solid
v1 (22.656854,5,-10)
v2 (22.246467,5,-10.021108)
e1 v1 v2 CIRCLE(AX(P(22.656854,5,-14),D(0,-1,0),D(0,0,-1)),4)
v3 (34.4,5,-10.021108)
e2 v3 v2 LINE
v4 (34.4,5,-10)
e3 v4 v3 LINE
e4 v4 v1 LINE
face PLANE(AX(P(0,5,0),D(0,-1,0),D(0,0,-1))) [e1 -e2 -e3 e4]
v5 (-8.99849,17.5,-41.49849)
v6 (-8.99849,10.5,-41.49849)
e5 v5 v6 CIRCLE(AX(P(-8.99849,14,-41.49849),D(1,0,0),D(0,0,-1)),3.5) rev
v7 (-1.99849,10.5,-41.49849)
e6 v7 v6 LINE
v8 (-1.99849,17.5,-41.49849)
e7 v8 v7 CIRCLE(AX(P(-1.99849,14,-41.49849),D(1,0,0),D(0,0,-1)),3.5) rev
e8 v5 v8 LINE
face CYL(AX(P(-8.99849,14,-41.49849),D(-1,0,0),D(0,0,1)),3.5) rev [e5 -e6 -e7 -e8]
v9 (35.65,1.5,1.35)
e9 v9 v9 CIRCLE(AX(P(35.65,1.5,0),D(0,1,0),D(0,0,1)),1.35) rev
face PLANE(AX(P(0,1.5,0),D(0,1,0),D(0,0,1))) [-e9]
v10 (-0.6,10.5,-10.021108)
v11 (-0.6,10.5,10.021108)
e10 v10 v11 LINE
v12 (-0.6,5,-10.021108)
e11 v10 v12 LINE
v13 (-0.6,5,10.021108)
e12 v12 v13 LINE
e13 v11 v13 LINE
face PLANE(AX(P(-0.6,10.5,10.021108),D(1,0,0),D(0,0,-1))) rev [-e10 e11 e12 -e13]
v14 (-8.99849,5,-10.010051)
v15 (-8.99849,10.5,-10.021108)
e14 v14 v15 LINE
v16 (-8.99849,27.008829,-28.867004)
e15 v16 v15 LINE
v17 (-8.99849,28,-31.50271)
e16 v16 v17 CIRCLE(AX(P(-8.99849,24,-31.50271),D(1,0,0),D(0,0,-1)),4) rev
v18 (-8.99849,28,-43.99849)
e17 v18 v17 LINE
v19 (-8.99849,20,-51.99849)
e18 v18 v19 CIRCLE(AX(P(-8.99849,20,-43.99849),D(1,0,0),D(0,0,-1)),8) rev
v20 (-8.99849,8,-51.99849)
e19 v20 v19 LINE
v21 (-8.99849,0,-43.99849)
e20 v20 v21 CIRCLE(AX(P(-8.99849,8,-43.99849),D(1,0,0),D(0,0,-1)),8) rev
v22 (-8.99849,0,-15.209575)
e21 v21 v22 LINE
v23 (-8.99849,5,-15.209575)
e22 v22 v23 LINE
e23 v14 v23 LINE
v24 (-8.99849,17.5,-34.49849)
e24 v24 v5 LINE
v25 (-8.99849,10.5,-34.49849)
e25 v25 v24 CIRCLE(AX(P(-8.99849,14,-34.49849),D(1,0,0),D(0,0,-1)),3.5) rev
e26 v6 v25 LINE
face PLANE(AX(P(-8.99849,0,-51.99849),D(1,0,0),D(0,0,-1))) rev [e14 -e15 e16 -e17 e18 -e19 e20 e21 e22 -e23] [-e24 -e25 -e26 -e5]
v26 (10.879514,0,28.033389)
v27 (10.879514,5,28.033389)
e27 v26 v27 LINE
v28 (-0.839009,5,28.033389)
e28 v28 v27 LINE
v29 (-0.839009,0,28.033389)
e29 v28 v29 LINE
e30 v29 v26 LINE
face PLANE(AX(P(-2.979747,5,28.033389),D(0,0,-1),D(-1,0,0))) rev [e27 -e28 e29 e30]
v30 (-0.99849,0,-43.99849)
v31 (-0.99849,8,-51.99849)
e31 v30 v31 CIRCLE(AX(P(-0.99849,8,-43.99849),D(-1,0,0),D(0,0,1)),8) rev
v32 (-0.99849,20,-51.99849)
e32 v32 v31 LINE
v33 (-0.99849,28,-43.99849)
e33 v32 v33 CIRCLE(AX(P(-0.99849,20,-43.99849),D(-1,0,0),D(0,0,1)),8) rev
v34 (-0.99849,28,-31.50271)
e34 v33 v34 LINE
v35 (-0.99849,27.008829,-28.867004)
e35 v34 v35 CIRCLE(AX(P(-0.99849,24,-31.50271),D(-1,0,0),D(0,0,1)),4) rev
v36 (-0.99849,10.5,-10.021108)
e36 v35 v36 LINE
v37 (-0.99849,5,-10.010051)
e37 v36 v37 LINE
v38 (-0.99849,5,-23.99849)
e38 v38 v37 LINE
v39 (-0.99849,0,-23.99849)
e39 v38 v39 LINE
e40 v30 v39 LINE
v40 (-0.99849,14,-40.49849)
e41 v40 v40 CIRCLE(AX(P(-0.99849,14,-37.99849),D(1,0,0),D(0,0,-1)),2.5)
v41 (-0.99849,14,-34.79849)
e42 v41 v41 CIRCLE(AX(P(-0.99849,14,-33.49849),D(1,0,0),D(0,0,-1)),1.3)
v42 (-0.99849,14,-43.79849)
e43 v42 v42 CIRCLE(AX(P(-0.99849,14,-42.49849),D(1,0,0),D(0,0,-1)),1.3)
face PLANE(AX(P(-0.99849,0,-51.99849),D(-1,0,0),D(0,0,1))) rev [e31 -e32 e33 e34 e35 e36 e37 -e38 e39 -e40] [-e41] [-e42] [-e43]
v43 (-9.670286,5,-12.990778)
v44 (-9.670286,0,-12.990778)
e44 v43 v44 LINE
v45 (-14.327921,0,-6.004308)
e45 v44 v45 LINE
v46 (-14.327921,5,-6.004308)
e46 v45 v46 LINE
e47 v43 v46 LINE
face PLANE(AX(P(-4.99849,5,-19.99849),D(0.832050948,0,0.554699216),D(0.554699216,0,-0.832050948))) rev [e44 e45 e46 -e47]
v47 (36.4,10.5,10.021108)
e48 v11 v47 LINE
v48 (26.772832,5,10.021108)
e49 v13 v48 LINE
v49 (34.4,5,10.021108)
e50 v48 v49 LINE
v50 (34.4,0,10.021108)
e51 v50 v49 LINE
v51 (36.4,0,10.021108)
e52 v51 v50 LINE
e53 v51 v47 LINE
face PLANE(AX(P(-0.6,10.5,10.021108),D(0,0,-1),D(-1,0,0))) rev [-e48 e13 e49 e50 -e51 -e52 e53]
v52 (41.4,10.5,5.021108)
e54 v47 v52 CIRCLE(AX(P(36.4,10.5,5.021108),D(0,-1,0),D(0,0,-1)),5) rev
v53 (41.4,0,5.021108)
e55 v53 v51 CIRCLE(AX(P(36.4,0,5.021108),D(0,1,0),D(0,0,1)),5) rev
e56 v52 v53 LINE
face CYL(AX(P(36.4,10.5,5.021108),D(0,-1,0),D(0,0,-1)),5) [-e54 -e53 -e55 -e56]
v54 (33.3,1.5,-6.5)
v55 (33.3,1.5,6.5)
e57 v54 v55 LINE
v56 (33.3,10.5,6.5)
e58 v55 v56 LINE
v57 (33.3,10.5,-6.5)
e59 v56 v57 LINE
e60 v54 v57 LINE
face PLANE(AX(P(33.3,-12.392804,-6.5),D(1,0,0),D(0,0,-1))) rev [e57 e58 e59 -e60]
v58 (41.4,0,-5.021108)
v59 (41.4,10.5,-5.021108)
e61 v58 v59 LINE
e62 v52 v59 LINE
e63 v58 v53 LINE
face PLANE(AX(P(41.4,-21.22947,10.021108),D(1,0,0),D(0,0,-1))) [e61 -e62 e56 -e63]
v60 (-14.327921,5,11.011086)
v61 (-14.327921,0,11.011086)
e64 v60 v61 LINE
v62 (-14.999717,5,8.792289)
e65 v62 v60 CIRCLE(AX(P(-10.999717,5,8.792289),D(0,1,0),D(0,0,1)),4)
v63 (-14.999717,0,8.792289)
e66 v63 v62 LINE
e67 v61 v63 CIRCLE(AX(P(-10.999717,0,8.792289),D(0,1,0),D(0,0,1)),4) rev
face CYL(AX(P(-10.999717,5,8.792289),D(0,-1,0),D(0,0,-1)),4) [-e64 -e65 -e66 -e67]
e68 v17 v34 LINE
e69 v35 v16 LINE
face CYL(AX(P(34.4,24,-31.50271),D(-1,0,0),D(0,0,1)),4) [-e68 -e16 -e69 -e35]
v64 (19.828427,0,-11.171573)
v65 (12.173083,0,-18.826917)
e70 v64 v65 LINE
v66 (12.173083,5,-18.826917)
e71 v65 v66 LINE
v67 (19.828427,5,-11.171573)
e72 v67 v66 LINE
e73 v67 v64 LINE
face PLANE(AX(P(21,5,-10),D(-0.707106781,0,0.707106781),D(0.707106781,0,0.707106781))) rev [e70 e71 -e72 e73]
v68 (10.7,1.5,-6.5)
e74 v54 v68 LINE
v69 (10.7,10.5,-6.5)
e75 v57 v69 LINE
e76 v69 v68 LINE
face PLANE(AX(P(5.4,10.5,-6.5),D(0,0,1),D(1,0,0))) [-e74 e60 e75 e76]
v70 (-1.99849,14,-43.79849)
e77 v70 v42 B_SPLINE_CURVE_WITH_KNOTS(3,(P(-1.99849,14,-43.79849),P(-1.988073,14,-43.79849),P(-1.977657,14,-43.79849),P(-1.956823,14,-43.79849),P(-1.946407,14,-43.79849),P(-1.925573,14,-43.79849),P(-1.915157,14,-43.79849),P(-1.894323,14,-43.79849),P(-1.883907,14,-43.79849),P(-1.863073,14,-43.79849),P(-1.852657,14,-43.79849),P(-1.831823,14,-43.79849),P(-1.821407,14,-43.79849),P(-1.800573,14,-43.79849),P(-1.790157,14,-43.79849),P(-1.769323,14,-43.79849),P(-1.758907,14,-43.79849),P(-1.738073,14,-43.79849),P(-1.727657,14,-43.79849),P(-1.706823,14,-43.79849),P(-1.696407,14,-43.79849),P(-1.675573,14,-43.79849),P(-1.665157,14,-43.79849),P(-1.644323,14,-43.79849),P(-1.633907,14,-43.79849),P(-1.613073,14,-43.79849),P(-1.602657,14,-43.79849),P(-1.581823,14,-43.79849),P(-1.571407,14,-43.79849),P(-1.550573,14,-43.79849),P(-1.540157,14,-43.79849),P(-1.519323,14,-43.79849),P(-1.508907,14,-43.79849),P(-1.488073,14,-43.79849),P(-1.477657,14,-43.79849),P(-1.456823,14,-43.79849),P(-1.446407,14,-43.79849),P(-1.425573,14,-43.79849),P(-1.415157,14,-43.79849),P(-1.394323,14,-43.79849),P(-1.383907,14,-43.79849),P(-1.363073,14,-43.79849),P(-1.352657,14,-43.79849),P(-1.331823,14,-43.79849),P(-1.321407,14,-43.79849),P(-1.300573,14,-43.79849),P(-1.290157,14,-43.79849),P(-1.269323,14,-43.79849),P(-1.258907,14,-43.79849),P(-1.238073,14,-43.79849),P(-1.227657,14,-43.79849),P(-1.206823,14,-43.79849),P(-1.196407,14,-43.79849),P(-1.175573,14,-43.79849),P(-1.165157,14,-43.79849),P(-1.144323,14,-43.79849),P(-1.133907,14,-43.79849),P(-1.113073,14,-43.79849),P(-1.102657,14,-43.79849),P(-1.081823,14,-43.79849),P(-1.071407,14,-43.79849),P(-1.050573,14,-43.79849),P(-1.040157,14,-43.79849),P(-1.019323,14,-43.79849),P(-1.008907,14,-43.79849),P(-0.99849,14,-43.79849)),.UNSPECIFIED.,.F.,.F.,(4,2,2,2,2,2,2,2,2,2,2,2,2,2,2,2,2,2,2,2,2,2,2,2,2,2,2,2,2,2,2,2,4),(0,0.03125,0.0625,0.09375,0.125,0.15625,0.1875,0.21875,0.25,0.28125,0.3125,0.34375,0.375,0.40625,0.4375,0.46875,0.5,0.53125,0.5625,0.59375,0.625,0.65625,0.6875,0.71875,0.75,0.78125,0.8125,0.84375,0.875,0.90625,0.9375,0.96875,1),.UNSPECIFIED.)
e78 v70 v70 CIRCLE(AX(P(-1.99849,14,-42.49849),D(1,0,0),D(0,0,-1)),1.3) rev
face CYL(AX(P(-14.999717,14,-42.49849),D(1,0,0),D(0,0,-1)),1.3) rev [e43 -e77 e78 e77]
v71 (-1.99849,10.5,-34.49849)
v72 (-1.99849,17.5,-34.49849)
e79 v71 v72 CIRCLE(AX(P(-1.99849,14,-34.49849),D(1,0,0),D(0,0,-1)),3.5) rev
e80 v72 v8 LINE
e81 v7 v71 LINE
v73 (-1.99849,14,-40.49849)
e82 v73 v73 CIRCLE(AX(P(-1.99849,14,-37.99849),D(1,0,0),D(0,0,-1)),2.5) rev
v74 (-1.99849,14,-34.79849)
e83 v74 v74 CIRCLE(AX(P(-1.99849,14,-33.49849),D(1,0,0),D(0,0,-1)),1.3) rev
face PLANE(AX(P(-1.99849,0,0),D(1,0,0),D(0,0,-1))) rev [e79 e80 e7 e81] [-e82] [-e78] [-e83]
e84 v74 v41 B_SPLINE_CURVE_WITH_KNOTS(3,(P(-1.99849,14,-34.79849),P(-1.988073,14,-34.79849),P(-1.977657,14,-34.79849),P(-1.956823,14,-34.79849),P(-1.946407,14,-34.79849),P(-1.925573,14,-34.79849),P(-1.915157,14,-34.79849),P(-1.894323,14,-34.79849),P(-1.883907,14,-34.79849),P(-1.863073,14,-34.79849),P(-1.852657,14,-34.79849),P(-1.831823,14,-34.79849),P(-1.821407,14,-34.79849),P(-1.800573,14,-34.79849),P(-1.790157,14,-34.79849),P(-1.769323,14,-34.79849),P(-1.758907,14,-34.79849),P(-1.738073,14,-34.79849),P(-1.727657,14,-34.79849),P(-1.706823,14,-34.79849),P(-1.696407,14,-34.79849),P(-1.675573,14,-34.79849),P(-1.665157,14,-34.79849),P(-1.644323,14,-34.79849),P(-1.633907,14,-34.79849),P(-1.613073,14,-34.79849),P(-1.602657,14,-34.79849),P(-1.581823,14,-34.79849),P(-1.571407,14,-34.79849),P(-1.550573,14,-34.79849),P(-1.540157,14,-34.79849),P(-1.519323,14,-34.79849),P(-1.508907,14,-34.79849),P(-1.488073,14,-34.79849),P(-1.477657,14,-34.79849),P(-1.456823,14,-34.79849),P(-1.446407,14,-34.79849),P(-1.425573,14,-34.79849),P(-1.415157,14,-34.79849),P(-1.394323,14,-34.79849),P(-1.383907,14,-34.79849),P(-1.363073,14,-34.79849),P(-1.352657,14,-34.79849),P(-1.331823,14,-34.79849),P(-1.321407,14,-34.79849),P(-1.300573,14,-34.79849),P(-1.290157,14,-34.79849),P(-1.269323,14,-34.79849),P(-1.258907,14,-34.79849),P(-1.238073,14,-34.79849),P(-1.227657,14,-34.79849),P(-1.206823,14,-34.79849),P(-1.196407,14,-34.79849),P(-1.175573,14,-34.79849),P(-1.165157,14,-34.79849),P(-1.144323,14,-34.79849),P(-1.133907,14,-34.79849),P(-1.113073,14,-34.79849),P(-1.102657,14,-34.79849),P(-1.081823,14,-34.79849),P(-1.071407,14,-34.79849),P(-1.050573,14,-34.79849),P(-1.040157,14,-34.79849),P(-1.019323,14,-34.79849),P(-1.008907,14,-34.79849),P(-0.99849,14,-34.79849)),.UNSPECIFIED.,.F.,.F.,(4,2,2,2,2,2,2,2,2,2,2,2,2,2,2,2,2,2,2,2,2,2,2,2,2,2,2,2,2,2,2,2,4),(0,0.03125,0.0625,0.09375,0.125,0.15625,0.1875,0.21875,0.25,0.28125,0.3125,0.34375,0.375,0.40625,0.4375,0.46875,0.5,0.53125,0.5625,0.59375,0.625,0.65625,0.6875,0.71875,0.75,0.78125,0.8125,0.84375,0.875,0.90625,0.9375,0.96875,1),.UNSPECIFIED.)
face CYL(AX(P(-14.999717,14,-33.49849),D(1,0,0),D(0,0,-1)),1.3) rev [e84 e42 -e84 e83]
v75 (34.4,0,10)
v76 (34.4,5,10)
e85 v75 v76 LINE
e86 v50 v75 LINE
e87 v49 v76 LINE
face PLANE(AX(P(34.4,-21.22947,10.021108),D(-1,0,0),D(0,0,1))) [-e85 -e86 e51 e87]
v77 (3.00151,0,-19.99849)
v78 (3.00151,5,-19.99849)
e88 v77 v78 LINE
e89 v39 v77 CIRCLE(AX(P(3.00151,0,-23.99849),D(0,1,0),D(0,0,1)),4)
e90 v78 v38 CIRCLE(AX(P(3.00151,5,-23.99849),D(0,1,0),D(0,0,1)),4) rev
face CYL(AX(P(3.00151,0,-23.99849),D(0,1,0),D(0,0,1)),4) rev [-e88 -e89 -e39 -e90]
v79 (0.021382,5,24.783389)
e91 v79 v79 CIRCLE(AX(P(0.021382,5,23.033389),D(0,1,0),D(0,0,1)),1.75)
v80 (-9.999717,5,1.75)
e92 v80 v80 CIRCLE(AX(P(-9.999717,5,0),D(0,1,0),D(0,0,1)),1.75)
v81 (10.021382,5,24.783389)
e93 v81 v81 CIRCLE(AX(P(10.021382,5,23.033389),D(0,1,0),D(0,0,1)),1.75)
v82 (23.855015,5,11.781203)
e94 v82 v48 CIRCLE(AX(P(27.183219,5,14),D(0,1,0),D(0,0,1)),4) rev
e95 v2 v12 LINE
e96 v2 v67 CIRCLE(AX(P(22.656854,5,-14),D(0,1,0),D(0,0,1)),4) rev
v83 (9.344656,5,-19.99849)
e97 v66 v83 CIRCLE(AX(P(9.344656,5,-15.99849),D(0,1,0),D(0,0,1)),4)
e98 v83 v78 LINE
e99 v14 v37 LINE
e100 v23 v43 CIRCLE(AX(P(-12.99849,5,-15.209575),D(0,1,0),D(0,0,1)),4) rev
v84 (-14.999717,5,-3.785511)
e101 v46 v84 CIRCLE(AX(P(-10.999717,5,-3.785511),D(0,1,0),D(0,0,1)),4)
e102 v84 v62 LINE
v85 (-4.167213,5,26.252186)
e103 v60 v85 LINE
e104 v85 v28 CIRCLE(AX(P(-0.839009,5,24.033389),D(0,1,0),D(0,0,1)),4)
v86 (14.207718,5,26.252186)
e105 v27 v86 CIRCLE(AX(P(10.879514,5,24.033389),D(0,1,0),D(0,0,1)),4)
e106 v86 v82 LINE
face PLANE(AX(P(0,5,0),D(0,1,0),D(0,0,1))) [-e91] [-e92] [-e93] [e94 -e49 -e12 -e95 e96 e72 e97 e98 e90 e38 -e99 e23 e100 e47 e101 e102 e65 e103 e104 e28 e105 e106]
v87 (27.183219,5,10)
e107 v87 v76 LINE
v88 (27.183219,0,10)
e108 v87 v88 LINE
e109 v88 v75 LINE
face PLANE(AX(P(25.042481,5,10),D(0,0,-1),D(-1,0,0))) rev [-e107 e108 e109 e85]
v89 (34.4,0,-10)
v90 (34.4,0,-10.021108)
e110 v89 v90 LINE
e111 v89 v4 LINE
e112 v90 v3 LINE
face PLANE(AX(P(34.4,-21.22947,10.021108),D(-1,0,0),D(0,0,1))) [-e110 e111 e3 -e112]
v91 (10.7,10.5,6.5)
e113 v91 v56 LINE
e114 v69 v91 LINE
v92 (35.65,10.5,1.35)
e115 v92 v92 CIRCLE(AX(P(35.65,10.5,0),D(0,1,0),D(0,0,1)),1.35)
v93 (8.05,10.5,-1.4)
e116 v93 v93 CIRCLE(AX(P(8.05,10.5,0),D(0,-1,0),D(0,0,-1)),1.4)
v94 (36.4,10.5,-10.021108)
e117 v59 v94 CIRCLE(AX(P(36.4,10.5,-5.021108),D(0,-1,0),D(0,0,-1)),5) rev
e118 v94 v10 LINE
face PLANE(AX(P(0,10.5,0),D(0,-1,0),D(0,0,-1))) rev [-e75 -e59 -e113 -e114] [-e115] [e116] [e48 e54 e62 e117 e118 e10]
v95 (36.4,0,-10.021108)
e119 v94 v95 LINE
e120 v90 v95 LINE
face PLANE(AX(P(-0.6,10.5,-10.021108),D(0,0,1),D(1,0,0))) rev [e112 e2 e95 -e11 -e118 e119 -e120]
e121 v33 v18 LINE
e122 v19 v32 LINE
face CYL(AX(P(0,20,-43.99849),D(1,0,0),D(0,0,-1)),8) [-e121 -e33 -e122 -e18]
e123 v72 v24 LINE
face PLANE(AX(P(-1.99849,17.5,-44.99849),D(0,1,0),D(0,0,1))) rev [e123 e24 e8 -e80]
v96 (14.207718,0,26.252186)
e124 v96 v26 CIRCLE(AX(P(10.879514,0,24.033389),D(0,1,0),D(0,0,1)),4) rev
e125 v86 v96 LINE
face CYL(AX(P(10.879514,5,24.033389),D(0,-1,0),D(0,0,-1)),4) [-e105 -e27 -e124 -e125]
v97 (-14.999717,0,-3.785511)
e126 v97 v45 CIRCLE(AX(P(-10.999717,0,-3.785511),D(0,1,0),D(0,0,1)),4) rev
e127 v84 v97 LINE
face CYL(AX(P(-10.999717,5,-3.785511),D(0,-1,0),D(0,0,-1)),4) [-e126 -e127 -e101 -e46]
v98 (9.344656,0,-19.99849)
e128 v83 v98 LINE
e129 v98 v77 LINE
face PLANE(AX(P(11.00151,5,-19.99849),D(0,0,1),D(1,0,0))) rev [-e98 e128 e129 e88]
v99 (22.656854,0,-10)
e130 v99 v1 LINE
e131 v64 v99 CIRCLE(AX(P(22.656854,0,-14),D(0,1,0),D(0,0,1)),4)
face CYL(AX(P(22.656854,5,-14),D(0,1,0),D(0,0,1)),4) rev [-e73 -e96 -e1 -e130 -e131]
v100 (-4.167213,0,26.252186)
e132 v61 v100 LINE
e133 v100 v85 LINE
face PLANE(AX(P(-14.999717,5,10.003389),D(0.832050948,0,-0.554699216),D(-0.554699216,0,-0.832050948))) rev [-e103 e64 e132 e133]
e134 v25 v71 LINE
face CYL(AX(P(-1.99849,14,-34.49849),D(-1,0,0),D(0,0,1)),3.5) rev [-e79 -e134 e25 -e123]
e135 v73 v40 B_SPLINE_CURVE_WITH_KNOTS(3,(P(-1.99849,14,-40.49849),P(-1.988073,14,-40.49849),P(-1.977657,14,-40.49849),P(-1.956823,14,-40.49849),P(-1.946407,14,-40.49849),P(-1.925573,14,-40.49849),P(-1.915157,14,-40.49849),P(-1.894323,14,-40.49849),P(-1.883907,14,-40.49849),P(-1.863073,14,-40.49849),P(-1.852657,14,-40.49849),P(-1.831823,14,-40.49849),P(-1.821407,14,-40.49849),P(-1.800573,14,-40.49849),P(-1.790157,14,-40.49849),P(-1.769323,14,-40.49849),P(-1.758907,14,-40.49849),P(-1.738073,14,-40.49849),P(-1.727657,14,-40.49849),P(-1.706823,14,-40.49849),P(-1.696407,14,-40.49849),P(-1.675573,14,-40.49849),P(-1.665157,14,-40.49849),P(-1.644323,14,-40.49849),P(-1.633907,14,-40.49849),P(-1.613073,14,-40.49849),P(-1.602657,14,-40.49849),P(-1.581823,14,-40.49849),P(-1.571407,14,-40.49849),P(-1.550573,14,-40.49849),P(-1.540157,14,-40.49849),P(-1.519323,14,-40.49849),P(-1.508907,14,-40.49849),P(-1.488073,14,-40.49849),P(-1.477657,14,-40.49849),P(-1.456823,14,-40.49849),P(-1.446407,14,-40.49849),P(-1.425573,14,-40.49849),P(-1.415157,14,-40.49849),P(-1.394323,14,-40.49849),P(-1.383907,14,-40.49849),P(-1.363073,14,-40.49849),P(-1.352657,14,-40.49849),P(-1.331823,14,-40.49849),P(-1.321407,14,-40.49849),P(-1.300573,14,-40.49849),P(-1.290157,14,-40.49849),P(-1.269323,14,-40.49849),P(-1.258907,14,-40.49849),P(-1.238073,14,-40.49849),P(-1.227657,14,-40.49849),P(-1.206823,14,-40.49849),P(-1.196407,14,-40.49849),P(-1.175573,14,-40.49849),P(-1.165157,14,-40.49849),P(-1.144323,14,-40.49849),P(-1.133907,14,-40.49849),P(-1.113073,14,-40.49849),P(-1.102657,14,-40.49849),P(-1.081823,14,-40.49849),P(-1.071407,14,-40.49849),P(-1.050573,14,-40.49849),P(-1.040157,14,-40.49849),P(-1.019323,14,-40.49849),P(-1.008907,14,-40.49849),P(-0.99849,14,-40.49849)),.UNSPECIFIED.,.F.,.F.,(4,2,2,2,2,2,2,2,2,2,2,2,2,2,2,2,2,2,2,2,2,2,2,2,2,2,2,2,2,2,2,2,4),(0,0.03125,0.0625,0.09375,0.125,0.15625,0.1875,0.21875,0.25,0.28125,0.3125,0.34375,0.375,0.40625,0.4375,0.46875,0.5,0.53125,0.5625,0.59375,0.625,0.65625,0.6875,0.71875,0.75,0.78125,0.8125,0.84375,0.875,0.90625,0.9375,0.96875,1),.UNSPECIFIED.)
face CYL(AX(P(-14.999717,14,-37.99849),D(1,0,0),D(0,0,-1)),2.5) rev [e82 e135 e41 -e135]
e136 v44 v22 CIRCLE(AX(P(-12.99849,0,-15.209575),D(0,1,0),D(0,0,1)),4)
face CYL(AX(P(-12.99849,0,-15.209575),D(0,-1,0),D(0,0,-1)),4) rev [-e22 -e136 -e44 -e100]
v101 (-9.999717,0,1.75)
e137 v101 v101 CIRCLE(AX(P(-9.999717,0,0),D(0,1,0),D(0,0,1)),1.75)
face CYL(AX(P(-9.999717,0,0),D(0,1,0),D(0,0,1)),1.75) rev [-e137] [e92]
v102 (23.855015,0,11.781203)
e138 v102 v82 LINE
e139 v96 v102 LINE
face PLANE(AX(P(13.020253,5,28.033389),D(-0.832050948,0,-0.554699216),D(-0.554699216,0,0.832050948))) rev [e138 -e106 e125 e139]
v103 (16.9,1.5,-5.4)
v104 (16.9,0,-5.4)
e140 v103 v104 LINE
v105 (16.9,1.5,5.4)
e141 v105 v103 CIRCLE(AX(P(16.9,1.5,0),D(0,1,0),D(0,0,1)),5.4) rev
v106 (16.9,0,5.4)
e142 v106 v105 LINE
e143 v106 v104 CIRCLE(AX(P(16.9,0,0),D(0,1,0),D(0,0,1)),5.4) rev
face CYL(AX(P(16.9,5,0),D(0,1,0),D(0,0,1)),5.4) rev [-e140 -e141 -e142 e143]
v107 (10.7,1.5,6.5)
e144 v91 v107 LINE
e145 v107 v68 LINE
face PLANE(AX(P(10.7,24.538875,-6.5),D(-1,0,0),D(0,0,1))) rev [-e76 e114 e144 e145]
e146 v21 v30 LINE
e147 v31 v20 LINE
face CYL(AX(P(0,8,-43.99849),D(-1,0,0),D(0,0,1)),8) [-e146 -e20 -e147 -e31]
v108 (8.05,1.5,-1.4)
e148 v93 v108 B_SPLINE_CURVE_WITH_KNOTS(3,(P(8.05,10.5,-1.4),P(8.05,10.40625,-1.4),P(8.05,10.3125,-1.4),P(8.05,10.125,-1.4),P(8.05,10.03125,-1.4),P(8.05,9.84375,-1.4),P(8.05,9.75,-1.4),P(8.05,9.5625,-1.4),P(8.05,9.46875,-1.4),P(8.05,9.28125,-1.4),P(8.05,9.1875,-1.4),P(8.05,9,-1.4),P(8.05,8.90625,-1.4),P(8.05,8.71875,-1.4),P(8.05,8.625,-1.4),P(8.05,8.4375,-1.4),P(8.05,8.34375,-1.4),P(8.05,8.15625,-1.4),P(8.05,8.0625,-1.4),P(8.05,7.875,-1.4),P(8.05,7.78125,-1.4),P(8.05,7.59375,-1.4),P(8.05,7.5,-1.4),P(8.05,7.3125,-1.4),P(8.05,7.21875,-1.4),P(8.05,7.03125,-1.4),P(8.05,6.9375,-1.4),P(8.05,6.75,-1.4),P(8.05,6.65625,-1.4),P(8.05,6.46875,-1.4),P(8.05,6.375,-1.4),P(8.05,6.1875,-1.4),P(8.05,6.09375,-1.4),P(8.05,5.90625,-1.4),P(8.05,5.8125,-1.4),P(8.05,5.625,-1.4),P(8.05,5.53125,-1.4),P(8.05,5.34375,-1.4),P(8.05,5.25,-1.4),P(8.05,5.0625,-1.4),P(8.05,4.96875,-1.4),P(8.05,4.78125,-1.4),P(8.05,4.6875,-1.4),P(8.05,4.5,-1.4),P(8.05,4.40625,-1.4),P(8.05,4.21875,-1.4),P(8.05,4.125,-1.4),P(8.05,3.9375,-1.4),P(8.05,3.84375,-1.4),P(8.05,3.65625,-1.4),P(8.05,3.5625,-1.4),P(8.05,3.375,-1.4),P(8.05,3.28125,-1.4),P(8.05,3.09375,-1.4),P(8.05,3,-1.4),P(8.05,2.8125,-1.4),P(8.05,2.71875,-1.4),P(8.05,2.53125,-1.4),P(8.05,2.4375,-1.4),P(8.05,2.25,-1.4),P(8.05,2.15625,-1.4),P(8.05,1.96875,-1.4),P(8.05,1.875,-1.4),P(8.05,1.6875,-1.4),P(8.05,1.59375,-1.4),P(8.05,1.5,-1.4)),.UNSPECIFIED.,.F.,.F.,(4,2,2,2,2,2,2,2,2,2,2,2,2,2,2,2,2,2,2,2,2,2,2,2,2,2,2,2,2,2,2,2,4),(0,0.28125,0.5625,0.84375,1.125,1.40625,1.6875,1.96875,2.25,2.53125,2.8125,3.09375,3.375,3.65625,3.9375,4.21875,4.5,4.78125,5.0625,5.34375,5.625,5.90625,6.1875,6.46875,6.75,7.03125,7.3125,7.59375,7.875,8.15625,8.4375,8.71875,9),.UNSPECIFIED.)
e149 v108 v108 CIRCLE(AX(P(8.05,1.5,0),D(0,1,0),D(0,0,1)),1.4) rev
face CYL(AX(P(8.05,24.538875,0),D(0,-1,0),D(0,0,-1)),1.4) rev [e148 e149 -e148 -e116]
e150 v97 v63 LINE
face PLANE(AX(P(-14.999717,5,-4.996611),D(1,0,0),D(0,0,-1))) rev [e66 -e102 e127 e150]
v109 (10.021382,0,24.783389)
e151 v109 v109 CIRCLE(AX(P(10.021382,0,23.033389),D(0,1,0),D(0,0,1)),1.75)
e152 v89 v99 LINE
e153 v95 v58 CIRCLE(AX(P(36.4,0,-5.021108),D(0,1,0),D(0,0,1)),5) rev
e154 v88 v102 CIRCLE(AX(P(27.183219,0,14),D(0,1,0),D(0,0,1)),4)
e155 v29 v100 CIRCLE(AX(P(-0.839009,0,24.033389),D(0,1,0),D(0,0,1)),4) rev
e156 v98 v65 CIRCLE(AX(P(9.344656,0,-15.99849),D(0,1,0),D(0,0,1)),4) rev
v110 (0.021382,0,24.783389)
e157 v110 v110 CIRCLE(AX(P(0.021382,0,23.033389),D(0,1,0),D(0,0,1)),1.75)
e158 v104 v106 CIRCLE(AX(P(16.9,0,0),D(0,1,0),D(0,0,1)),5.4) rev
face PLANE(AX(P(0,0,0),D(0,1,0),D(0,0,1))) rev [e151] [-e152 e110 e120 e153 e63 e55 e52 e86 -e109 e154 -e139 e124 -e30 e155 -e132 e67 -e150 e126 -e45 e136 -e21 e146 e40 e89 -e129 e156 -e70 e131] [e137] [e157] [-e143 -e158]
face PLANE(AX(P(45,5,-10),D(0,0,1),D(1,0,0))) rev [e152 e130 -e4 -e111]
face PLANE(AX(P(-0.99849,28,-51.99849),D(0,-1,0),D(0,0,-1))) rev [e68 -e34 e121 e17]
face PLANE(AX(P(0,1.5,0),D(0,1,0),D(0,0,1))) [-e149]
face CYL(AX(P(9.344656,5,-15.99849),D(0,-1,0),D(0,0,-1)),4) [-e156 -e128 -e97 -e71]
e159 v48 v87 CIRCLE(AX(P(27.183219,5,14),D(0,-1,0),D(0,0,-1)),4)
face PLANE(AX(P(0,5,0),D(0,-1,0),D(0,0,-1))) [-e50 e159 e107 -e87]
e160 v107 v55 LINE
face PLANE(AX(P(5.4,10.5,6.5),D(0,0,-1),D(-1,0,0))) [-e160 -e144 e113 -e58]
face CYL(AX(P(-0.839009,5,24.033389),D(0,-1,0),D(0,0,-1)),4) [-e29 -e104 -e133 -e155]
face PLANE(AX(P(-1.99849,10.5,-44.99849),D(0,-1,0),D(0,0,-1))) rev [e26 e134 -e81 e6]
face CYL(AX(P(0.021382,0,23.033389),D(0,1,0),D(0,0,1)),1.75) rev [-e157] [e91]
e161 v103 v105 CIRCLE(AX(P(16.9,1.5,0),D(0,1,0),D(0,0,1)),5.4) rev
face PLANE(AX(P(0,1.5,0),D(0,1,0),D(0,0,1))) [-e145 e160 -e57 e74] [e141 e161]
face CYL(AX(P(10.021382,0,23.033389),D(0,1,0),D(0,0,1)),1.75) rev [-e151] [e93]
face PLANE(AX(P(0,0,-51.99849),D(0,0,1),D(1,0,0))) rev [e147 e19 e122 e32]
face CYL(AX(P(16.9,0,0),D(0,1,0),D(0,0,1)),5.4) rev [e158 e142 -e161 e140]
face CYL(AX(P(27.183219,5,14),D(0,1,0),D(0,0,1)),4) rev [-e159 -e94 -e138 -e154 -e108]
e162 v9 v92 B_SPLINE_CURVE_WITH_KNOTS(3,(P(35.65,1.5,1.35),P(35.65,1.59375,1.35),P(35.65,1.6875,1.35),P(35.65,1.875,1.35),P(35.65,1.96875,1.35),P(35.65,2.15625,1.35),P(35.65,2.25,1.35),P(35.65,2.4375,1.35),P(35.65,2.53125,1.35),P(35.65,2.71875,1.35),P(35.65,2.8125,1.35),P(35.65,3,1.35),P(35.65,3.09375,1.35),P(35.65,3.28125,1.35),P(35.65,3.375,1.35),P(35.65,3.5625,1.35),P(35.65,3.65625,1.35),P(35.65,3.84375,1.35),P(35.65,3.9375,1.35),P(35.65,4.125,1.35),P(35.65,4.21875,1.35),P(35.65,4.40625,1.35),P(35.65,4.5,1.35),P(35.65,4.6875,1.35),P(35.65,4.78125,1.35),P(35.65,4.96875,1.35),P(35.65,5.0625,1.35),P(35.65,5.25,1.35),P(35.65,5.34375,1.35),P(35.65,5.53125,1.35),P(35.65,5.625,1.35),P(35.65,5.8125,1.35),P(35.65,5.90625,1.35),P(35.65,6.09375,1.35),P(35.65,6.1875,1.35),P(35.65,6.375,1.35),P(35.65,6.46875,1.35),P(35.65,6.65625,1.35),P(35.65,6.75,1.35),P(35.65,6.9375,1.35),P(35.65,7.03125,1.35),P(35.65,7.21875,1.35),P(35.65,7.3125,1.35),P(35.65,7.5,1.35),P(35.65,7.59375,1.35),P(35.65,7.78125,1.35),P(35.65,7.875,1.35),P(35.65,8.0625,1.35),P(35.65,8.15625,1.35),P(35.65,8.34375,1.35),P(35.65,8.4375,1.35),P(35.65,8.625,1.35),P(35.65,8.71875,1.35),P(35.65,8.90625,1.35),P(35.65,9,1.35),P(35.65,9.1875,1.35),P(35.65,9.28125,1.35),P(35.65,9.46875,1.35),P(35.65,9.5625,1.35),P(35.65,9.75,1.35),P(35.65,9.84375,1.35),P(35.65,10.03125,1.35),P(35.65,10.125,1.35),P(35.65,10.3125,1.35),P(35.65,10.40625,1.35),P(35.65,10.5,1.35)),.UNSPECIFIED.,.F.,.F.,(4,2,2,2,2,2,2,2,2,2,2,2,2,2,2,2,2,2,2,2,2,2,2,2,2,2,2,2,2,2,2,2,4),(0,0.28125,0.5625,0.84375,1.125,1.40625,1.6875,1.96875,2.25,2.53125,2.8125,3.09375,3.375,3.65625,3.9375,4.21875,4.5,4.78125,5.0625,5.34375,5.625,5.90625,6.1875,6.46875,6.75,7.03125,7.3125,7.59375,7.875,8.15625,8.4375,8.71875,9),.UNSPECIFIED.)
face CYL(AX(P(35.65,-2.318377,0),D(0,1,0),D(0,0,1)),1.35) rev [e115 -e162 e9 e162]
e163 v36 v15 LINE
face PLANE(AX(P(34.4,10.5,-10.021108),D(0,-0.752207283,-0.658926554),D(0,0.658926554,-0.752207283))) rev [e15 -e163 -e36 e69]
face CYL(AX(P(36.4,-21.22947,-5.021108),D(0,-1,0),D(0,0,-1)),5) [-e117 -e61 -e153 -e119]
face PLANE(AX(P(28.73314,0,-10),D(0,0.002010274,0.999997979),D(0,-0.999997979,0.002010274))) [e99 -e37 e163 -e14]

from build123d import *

# Parameters (mm, degrees)
BOSS_EXTRUDE1_DEPTH = 5
SKETCH2_R           = 1.75
SKETCH2_W           = 10.8
SKETCH2_H           = 10.8
CUT_EXTRUDE1_DEPTH  = 54.252895531
FILLET1_R           = 5.4
FILLET2_R           = 5.4
FILLET3_RADIUS      = 10
FILLET3_LENGTH      = 5
SKETCH6_W           = 35
SKETCH6_H           = 20.042215846
SKETCH6_W_2         = 23
SKETCH6_H_2         = 13
BOSS_EXTRUDE3_DEPTH = 5.5
SKETCH7_W           = 23
SKETCH7_H           = 13
CUT_EXTRUDE3_DEPTH  = 3.5
CUT_EXTRUDE4_DEPTH  = 54.302165833
SKETCH9_W           = 8
SKETCH9_H           = 28
BOSS_EXTRUDE4_DEPTH = 32
SKETCH11_R          = 2.5
SKETCH11_R_2        = 1.3
CUT_EXTRUDE5_DEPTH  = 69.854164991
FILLET6_R           = 8
BOSS_EXTRUDE5_DEPTH = 8
SKETCH13_W          = 14
SKETCH13_H          = 7
CUT_EXTRUDE6_DEPTH  = 7
FILLET7_R           = 3.5
FILLET8_R           = 3.5
CUT_EXTRUDE7_DEPTH  = 74.28896148
FILLET9_R           = 4
SKETCH15_W          = 5.3
SKETCH15_H          = 13
SKETCH15_R          = 1.4
BOSS_EXTRUDE6_DEPTH = 9
SKETCH16_W          = 7
SKETCH16_H          = 20.042215846
BOSS_EXTRUDE7_DEPTH = 10.5
SKETCH17_R          = 1.35
CUT_EXTRUDE8_DEPTH  = 9
FILLET10_R          = 5
SKETCH18_W          = 4.9
SKETCH18_H          = 13
CUT_EXTRUDE9_DEPTH  = 9


# Some blends are built 0.0001 mm under size
with BuildPart() as part:
    # Sketch1 → Boss-Extrude1 (new body)
    with BuildSketch(Plane(origin=(0, 0, 0), x_dir=(1, 0, 0), z_dir=(0, 1, 0))):
        Polygon((45, -10), (45, 10), (21, 10), (11.001510114, 19.998489886), (-4.998489886, 19.998489886), (-14.999716743, 4.996611292), (-14.999716743, -10.003388708), (-2.979747437, -28.033388708), (13.020252563, -28.033388708), (25.042481003, -10), align=None)
    extrude(amount=BOSS_EXTRUDE1_DEPTH)

    # Sketch2 → Cut-Extrude1 (cut, through all)
    with BuildSketch(Plane(origin=(0, 5, 0), x_dir=(1, 0, 0), z_dir=(0, 1, 0))):
        with Locations(Location((-9.999716743, 0, 0), (0, 0, 270))):
            Circle(SKETCH2_R)
        with Locations(Location((0.02138213, -23.033388708, 0), (0, 0, 270))):
            Circle(SKETCH2_R)
        with Locations(Location((10.02138213, -23.033388708, 0), (0, 0, 270))):
            Circle(SKETCH2_R)
        with Locations((16.9, 0)):
            Rectangle(SKETCH2_W, SKETCH2_H)
    extrude(amount=-CUT_EXTRUDE1_DEPTH, mode=Mode.SUBTRACT)

    # Fillet1
    fillet1_edges = [part.edges().sort_by_distance(p)[0] for p in [
        (11.5, 2.5, 5.4),
        (11.5, 2.5, -5.4),
    ]]
    fillet(fillet1_edges, radius=FILLET1_R - 0.0001)  # a hair under: the kernel refuses the full size

    # Fillet2
    # the kernel refuses this fillet: 5.4 mm, written as the material it adds along each edge
    with BuildSketch(Plane(origin=(22.3, 5, 5.4), x_dir=(-1, 0, 0), z_dir=(0, -1, 0)), Plane(origin=(22.3, 5, -5.4), x_dir=(0, 0, 1), z_dir=(0, -1, 0))) as fillet2_piece_1:
        with BuildLine():
            CenterArc((FILLET2_R, FILLET2_R), FILLET2_R, 180, 90)
            Line((0, FILLET2_R), (0, 0))
            Line((0, 0), (FILLET2_R, 0))
        make_face()
    extrude(amount=5)
    # the kernel refuses this fillet: 5.4 mm, written as the material it takes off along each edge

    # Fillet3: full round fillet: the end face becomes a half cylinder, R = half its width
    fillet3_face = Plane((45, 2.5, 0), x_dir=(0, 1, 0), z_dir=(1, 0, 0))  # on the end face: x along it, z out of the body
    fillet3_slab = fillet3_face.offset(-FILLET3_RADIUS / 2) * Box(FILLET3_LENGTH, 2 * FILLET3_RADIUS, FILLET3_RADIUS, mode=Mode.PRIVATE)  # the body's end, R deep
    fillet3_round = Plane((35, 2.5, 0), x_dir=(1, 0, 0), z_dir=(0, 1, 0)) * Cylinder(FILLET3_RADIUS, FILLET3_LENGTH, mode=Mode.PRIVATE)  # its axis R under the face
    add(fillet3_slab - fillet3_round, mode=Mode.SUBTRACT)

    # Sketch6 → Boss-Extrude3 (add)
    with BuildSketch(Plane(origin=(0, 5, 0), x_dir=(1, 0, 0), z_dir=(0, 1, 0))):
        with Locations((16.9, 0)):
            Rectangle(SKETCH6_W, SKETCH6_H)
        with Locations((16.9, 0)):
            Rectangle(SKETCH6_W_2, SKETCH6_H_2, mode=Mode.SUBTRACT)
    extrude(amount=BOSS_EXTRUDE3_DEPTH)

    # Sketch7 → Cut-Extrude3 (cut)
    with BuildSketch(Plane(origin=(0, 5, 0), x_dir=(1, 0, 0), z_dir=(0, 1, 0))):
        with Locations((16.9, 0)):
            Rectangle(SKETCH7_W, SKETCH7_H)
    extrude(amount=-CUT_EXTRUDE3_DEPTH, mode=Mode.SUBTRACT)

    # Sketch8 → Cut-Extrude4 (cut, through all)
    with BuildSketch(Plane(origin=(0, 5, 0), x_dir=(1, 0, 0), z_dir=(0, 1, 0))):
        with BuildLine():
            Line((34.4, 10), (34.4, -10))
            Line((34.4, -10), (35, -10))
            ThreePointArc((35, -10), (45, 0), (35, 10))
            Line((35, 10), (34.4, 10))
        make_face()
    extrude(amount=-CUT_EXTRUDE4_DEPTH, mode=Mode.SUBTRACT)

    # Sketch9 → Boss-Extrude4 (add)
    with BuildSketch(Plane(origin=(0, 0, -19.998489886), x_dir=(-1, 0, 0), z_dir=(0, 0, -1))):
        with Locations((4.998489886, 14)):
            Rectangle(SKETCH9_W, SKETCH9_H)
    extrude(amount=BOSS_EXTRUDE4_DEPTH)

    # Sketch11 → Cut-Extrude5 (cut, through all)
    with BuildSketch(Plane(origin=(-0.998489886, 0, 0), x_dir=(0, 0, -1), z_dir=(1, 0, 0))):
        with Locations((37.998489886, 14)):
            Circle(SKETCH11_R)
        with Locations((33.498489886, 14)):
            Circle(SKETCH11_R_2)
        with Locations((42.498489886, 14)):
            Circle(SKETCH11_R_2)
    extrude(amount=-CUT_EXTRUDE5_DEPTH, mode=Mode.SUBTRACT)

    # Fillet6
    fillet6_edges = [part.edges().sort_by_distance(p)[0] for p in [
        (-4.998489886, 0, -51.998489886),
        (-4.998489886, 28, -51.998489886),
    ]]
    fillet(fillet6_edges, radius=FILLET6_R)

    # Sketch12 → Boss-Extrude5 (add)
    with BuildSketch(Plane.ZY.offset(8.998489886)):
        Polygon((-10.021107923, 10.5), (-19.998489886, 28), (-19.998489886, 0), (-10, 0), align=None)
    extrude(amount=-BOSS_EXTRUDE5_DEPTH)

    # Sketch13 → Cut-Extrude6 (cut)
    with BuildSketch(Plane.ZY.offset(8.998489886)):
        with Locations((-37.998489886, 14)):
            Rectangle(SKETCH13_W, SKETCH13_H)
    extrude(amount=-CUT_EXTRUDE6_DEPTH, mode=Mode.SUBTRACT)

    # Fillet7
    fillet7_edges = [part.edges().sort_by_distance(p)[0] for p in [
        (-5.498489886, 10.5, -44.998489886),
        (-5.498489886, 17.5, -44.998489886),
    ]]
    fillet(fillet7_edges, radius=FILLET7_R - 0.0001)  # a hair under: the kernel refuses the full size

    # Fillet8
    fillet8_edges = [part.edges().sort_by_distance(p)[0] for p in [
        (-5.498489886, 17.5, -30.998489886),
        (-5.498489886, 10.5, -30.998489886),
    ]]
    fillet(fillet8_edges, radius=FILLET8_R - 0.0001)  # a hair under: the kernel refuses the full size

    # Sketch14 → Cut-Extrude7 (cut, through all)
    with BuildSketch(Plane.ZY.offset(8.998489886)):
        Polygon((-10.021107923, 10.5), (-29.998489886, 28), (-19.998489886, 28), align=None)
    extrude(amount=-CUT_EXTRUDE7_DEPTH, mode=Mode.SUBTRACT)

    # Fillet9
    # the kernel refuses this fillet: 4 mm, written as the material it adds along each edge
    with BuildSketch(Plane(origin=(-0.998489886, 5, -19.998489886), x_dir=(1, 0, 0), z_dir=(0, -1, 0))) as fillet9_piece_1:
        with BuildLine():
            CenterArc((FILLET9_R, -FILLET9_R), FILLET9_R, 90, 90)
            Line((0, -FILLET9_R), (0, 0))
            Line((0, 0), (FILLET9_R, 0))
        make_face()
    extrude(amount=5)
    with BuildSketch(Plane(origin=(25.042481003, 0, 10), x_dir=(-0.5546992156114033, 0, 0.8320509480795595), z_dir=(0, 1, 0))) as fillet9_piece_2:
        with BuildLine():
            CenterArc((FILLET9_R * 0.535184516545, FILLET9_R), FILLET9_R, 213.69, 56.31)
            Line((-FILLET9_R * 0.296866431535, FILLET9_R * 0.445300784389), (0, 0))
            Line((0, 0), (FILLET9_R * 0.535184516545, 0))
        make_face()
    extrude(amount=5)
    with BuildSketch(Plane(origin=(21, 0, -10), x_dir=(1, 0, 0), z_dir=(0, 1, 0))) as fillet9_piece_3:
        with BuildLine():
            CenterArc((FILLET9_R * 0.414213562373, FILLET9_R), FILLET9_R, 225, 45)
            Line((-FILLET9_R * 0.292893218813, FILLET9_R * 0.292893218813), (0, 0))
            Line((0, 0), (FILLET9_R * 0.414213562373, 0))
        make_face()
    extrude(amount=5)
    with BuildSketch(Plane(origin=(-8.998489886, 5, -13.998474565), x_dir=(0, 0, -1), z_dir=(0, -1, 0))) as fillet9_piece_4:
        with BuildLine():
            CenterArc((FILLET9_R * 0.302774994436, -FILLET9_R), FILLET9_R, 90, 33.69)
            Line((-FILLET9_R * 0.251924221175, -FILLET9_R * 0.16794905192), (0, 0))
            Line((0, 0), (FILLET9_R * 0.302774994436, 0))
        make_face()
    extrude(amount=5)
    # the kernel refuses this fillet: 4 mm, written as the material it takes off along each edge
    with BuildSketch(Plane(origin=(13.020252563, -5.351845165, 28.033388708), x_dir=(0.5546992156114035, 0, -0.8320509480795594), z_dir=(0, 1, 0)), Plane(origin=(-2.979747437, -5.351845165, 28.033388708), x_dir=(1, 0, 0), z_dir=(0, 1, 0))) as fillet9_2_piece_1:
        with BuildLine():
            CenterArc((FILLET9_R * 0.535184516545, FILLET9_R), FILLET9_R, 213.69, 56.31)
            Line((-FILLET9_R * 0.296866431535, FILLET9_R * 0.445300784389), (0, 0))
            Line((0, 0), (FILLET9_R * 0.535184516545, 0))
        make_face()
    extrude(amount=15.703690331, mode=Mode.SUBTRACT)
    with BuildSketch(Plane(origin=(-14.999716743, -3.027749944, 10.003388708), x_dir=(0.5546992156114036, 0, 0.8320509480795593), z_dir=(0, 1, 0)), Plane(origin=(-14.999716743, -3.027749944, -4.996611292), x_dir=(0, 0, 1), z_dir=(0, 1, 0))) as fillet9_2_piece_2:
        with BuildLine():
            CenterArc((FILLET9_R * 0.302774994436, FILLET9_R), FILLET9_R, 236.31, 33.69)
            Line((-FILLET9_R * 0.251924221175, FILLET9_R * 0.16794905192), (0, 0))
            Line((0, 0), (FILLET9_R * 0.302774994436, 0))
        make_face()
    extrude(amount=11.055499889, mode=Mode.SUBTRACT)
    with BuildSketch(Plane(origin=(11.001510114, -4.142135624, -19.998489886), x_dir=(-1, 0, 0), z_dir=(0, 1, 0))) as fillet9_2_piece_3:
        with BuildLine():
            CenterArc((FILLET9_R * 0.414213562373, FILLET9_R), FILLET9_R, 225, 45)
            Line((-FILLET9_R * 0.292893218813, FILLET9_R * 0.292893218813), (0, 0))
            Line((0, 0), (FILLET9_R * 0.414213562373, 0))
        make_face()
    extrude(amount=13.284271247, mode=Mode.SUBTRACT)
    with BuildSketch(Plane(origin=(-12.759041279, 28, -29.998489886), x_dir=(0, -0.658926553885557, 0.7522072829908683), z_dir=(1, 0, 0))) as fillet9_2_piece_4:
        with BuildLine():
            CenterArc((FILLET9_R * 0.376055139299, FILLET9_R), FILLET9_R, 228.781943012, 41.218056988)
            Line((-FILLET9_R * 0.282871414587, FILLET9_R * 0.247792717009), (0, 0))
            Line((0, 0), (FILLET9_R * 0.376055139299, 0))
        make_face()
    extrude(amount=15.521102786, mode=Mode.SUBTRACT)

    # Sketch15 → Boss-Extrude6 (add)
    with BuildSketch(Plane(origin=(0, 1.5, 0), x_dir=(1, 0, 0), z_dir=(0, 1, 0))):
        with Locations((8.05, 0)):
            Rectangle(SKETCH15_W, SKETCH15_H)
        with Locations(Location((8.05, 0, 0), (0, 0, 90))):
            Circle(SKETCH15_R, mode=Mode.SUBTRACT)
    extrude(amount=BOSS_EXTRUDE6_DEPTH)

    # Sketch16 → Boss-Extrude7 (add)
    with BuildSketch(Plane(origin=(0, 10.5, 0), x_dir=(1, 0, 0), z_dir=(0, 1, 0))):
        with Locations((37.9, 0)):
            Rectangle(SKETCH16_W, SKETCH16_H)
    extrude(amount=-BOSS_EXTRUDE7_DEPTH)

    # Sketch17 → Cut-Extrude8 (cut)
    with BuildSketch(Plane(origin=(0, 10.5, 0), x_dir=(1, 0, 0), z_dir=(0, 1, 0))):
        with Locations(Location((35.65, 0, 0), (0, 0, 270))):
            Circle(SKETCH17_R)
    extrude(amount=-CUT_EXTRUDE8_DEPTH, mode=Mode.SUBTRACT)

    # Fillet10
    fillet10_edges = [part.edges().sort_by_distance(p)[0] for p in [
        (41.4, 5.25, -10.021107923),
        (41.4, 5.25, 10.021107923),
    ]]
    fillet(fillet10_edges, radius=FILLET10_R)

    # Sketch18 → Cut-Extrude9 (cut)
    with BuildSketch(Plane(origin=(0, 10.5, 0), x_dir=(1, 0, 0), z_dir=(0, 1, 0))):
        with Locations((30.85, 0)):
            Rectangle(SKETCH18_W, SKETCH18_H)
    extrude(amount=-CUT_EXTRUDE9_DEPTH, mode=Mode.SUBTRACT)


solid = part.part
